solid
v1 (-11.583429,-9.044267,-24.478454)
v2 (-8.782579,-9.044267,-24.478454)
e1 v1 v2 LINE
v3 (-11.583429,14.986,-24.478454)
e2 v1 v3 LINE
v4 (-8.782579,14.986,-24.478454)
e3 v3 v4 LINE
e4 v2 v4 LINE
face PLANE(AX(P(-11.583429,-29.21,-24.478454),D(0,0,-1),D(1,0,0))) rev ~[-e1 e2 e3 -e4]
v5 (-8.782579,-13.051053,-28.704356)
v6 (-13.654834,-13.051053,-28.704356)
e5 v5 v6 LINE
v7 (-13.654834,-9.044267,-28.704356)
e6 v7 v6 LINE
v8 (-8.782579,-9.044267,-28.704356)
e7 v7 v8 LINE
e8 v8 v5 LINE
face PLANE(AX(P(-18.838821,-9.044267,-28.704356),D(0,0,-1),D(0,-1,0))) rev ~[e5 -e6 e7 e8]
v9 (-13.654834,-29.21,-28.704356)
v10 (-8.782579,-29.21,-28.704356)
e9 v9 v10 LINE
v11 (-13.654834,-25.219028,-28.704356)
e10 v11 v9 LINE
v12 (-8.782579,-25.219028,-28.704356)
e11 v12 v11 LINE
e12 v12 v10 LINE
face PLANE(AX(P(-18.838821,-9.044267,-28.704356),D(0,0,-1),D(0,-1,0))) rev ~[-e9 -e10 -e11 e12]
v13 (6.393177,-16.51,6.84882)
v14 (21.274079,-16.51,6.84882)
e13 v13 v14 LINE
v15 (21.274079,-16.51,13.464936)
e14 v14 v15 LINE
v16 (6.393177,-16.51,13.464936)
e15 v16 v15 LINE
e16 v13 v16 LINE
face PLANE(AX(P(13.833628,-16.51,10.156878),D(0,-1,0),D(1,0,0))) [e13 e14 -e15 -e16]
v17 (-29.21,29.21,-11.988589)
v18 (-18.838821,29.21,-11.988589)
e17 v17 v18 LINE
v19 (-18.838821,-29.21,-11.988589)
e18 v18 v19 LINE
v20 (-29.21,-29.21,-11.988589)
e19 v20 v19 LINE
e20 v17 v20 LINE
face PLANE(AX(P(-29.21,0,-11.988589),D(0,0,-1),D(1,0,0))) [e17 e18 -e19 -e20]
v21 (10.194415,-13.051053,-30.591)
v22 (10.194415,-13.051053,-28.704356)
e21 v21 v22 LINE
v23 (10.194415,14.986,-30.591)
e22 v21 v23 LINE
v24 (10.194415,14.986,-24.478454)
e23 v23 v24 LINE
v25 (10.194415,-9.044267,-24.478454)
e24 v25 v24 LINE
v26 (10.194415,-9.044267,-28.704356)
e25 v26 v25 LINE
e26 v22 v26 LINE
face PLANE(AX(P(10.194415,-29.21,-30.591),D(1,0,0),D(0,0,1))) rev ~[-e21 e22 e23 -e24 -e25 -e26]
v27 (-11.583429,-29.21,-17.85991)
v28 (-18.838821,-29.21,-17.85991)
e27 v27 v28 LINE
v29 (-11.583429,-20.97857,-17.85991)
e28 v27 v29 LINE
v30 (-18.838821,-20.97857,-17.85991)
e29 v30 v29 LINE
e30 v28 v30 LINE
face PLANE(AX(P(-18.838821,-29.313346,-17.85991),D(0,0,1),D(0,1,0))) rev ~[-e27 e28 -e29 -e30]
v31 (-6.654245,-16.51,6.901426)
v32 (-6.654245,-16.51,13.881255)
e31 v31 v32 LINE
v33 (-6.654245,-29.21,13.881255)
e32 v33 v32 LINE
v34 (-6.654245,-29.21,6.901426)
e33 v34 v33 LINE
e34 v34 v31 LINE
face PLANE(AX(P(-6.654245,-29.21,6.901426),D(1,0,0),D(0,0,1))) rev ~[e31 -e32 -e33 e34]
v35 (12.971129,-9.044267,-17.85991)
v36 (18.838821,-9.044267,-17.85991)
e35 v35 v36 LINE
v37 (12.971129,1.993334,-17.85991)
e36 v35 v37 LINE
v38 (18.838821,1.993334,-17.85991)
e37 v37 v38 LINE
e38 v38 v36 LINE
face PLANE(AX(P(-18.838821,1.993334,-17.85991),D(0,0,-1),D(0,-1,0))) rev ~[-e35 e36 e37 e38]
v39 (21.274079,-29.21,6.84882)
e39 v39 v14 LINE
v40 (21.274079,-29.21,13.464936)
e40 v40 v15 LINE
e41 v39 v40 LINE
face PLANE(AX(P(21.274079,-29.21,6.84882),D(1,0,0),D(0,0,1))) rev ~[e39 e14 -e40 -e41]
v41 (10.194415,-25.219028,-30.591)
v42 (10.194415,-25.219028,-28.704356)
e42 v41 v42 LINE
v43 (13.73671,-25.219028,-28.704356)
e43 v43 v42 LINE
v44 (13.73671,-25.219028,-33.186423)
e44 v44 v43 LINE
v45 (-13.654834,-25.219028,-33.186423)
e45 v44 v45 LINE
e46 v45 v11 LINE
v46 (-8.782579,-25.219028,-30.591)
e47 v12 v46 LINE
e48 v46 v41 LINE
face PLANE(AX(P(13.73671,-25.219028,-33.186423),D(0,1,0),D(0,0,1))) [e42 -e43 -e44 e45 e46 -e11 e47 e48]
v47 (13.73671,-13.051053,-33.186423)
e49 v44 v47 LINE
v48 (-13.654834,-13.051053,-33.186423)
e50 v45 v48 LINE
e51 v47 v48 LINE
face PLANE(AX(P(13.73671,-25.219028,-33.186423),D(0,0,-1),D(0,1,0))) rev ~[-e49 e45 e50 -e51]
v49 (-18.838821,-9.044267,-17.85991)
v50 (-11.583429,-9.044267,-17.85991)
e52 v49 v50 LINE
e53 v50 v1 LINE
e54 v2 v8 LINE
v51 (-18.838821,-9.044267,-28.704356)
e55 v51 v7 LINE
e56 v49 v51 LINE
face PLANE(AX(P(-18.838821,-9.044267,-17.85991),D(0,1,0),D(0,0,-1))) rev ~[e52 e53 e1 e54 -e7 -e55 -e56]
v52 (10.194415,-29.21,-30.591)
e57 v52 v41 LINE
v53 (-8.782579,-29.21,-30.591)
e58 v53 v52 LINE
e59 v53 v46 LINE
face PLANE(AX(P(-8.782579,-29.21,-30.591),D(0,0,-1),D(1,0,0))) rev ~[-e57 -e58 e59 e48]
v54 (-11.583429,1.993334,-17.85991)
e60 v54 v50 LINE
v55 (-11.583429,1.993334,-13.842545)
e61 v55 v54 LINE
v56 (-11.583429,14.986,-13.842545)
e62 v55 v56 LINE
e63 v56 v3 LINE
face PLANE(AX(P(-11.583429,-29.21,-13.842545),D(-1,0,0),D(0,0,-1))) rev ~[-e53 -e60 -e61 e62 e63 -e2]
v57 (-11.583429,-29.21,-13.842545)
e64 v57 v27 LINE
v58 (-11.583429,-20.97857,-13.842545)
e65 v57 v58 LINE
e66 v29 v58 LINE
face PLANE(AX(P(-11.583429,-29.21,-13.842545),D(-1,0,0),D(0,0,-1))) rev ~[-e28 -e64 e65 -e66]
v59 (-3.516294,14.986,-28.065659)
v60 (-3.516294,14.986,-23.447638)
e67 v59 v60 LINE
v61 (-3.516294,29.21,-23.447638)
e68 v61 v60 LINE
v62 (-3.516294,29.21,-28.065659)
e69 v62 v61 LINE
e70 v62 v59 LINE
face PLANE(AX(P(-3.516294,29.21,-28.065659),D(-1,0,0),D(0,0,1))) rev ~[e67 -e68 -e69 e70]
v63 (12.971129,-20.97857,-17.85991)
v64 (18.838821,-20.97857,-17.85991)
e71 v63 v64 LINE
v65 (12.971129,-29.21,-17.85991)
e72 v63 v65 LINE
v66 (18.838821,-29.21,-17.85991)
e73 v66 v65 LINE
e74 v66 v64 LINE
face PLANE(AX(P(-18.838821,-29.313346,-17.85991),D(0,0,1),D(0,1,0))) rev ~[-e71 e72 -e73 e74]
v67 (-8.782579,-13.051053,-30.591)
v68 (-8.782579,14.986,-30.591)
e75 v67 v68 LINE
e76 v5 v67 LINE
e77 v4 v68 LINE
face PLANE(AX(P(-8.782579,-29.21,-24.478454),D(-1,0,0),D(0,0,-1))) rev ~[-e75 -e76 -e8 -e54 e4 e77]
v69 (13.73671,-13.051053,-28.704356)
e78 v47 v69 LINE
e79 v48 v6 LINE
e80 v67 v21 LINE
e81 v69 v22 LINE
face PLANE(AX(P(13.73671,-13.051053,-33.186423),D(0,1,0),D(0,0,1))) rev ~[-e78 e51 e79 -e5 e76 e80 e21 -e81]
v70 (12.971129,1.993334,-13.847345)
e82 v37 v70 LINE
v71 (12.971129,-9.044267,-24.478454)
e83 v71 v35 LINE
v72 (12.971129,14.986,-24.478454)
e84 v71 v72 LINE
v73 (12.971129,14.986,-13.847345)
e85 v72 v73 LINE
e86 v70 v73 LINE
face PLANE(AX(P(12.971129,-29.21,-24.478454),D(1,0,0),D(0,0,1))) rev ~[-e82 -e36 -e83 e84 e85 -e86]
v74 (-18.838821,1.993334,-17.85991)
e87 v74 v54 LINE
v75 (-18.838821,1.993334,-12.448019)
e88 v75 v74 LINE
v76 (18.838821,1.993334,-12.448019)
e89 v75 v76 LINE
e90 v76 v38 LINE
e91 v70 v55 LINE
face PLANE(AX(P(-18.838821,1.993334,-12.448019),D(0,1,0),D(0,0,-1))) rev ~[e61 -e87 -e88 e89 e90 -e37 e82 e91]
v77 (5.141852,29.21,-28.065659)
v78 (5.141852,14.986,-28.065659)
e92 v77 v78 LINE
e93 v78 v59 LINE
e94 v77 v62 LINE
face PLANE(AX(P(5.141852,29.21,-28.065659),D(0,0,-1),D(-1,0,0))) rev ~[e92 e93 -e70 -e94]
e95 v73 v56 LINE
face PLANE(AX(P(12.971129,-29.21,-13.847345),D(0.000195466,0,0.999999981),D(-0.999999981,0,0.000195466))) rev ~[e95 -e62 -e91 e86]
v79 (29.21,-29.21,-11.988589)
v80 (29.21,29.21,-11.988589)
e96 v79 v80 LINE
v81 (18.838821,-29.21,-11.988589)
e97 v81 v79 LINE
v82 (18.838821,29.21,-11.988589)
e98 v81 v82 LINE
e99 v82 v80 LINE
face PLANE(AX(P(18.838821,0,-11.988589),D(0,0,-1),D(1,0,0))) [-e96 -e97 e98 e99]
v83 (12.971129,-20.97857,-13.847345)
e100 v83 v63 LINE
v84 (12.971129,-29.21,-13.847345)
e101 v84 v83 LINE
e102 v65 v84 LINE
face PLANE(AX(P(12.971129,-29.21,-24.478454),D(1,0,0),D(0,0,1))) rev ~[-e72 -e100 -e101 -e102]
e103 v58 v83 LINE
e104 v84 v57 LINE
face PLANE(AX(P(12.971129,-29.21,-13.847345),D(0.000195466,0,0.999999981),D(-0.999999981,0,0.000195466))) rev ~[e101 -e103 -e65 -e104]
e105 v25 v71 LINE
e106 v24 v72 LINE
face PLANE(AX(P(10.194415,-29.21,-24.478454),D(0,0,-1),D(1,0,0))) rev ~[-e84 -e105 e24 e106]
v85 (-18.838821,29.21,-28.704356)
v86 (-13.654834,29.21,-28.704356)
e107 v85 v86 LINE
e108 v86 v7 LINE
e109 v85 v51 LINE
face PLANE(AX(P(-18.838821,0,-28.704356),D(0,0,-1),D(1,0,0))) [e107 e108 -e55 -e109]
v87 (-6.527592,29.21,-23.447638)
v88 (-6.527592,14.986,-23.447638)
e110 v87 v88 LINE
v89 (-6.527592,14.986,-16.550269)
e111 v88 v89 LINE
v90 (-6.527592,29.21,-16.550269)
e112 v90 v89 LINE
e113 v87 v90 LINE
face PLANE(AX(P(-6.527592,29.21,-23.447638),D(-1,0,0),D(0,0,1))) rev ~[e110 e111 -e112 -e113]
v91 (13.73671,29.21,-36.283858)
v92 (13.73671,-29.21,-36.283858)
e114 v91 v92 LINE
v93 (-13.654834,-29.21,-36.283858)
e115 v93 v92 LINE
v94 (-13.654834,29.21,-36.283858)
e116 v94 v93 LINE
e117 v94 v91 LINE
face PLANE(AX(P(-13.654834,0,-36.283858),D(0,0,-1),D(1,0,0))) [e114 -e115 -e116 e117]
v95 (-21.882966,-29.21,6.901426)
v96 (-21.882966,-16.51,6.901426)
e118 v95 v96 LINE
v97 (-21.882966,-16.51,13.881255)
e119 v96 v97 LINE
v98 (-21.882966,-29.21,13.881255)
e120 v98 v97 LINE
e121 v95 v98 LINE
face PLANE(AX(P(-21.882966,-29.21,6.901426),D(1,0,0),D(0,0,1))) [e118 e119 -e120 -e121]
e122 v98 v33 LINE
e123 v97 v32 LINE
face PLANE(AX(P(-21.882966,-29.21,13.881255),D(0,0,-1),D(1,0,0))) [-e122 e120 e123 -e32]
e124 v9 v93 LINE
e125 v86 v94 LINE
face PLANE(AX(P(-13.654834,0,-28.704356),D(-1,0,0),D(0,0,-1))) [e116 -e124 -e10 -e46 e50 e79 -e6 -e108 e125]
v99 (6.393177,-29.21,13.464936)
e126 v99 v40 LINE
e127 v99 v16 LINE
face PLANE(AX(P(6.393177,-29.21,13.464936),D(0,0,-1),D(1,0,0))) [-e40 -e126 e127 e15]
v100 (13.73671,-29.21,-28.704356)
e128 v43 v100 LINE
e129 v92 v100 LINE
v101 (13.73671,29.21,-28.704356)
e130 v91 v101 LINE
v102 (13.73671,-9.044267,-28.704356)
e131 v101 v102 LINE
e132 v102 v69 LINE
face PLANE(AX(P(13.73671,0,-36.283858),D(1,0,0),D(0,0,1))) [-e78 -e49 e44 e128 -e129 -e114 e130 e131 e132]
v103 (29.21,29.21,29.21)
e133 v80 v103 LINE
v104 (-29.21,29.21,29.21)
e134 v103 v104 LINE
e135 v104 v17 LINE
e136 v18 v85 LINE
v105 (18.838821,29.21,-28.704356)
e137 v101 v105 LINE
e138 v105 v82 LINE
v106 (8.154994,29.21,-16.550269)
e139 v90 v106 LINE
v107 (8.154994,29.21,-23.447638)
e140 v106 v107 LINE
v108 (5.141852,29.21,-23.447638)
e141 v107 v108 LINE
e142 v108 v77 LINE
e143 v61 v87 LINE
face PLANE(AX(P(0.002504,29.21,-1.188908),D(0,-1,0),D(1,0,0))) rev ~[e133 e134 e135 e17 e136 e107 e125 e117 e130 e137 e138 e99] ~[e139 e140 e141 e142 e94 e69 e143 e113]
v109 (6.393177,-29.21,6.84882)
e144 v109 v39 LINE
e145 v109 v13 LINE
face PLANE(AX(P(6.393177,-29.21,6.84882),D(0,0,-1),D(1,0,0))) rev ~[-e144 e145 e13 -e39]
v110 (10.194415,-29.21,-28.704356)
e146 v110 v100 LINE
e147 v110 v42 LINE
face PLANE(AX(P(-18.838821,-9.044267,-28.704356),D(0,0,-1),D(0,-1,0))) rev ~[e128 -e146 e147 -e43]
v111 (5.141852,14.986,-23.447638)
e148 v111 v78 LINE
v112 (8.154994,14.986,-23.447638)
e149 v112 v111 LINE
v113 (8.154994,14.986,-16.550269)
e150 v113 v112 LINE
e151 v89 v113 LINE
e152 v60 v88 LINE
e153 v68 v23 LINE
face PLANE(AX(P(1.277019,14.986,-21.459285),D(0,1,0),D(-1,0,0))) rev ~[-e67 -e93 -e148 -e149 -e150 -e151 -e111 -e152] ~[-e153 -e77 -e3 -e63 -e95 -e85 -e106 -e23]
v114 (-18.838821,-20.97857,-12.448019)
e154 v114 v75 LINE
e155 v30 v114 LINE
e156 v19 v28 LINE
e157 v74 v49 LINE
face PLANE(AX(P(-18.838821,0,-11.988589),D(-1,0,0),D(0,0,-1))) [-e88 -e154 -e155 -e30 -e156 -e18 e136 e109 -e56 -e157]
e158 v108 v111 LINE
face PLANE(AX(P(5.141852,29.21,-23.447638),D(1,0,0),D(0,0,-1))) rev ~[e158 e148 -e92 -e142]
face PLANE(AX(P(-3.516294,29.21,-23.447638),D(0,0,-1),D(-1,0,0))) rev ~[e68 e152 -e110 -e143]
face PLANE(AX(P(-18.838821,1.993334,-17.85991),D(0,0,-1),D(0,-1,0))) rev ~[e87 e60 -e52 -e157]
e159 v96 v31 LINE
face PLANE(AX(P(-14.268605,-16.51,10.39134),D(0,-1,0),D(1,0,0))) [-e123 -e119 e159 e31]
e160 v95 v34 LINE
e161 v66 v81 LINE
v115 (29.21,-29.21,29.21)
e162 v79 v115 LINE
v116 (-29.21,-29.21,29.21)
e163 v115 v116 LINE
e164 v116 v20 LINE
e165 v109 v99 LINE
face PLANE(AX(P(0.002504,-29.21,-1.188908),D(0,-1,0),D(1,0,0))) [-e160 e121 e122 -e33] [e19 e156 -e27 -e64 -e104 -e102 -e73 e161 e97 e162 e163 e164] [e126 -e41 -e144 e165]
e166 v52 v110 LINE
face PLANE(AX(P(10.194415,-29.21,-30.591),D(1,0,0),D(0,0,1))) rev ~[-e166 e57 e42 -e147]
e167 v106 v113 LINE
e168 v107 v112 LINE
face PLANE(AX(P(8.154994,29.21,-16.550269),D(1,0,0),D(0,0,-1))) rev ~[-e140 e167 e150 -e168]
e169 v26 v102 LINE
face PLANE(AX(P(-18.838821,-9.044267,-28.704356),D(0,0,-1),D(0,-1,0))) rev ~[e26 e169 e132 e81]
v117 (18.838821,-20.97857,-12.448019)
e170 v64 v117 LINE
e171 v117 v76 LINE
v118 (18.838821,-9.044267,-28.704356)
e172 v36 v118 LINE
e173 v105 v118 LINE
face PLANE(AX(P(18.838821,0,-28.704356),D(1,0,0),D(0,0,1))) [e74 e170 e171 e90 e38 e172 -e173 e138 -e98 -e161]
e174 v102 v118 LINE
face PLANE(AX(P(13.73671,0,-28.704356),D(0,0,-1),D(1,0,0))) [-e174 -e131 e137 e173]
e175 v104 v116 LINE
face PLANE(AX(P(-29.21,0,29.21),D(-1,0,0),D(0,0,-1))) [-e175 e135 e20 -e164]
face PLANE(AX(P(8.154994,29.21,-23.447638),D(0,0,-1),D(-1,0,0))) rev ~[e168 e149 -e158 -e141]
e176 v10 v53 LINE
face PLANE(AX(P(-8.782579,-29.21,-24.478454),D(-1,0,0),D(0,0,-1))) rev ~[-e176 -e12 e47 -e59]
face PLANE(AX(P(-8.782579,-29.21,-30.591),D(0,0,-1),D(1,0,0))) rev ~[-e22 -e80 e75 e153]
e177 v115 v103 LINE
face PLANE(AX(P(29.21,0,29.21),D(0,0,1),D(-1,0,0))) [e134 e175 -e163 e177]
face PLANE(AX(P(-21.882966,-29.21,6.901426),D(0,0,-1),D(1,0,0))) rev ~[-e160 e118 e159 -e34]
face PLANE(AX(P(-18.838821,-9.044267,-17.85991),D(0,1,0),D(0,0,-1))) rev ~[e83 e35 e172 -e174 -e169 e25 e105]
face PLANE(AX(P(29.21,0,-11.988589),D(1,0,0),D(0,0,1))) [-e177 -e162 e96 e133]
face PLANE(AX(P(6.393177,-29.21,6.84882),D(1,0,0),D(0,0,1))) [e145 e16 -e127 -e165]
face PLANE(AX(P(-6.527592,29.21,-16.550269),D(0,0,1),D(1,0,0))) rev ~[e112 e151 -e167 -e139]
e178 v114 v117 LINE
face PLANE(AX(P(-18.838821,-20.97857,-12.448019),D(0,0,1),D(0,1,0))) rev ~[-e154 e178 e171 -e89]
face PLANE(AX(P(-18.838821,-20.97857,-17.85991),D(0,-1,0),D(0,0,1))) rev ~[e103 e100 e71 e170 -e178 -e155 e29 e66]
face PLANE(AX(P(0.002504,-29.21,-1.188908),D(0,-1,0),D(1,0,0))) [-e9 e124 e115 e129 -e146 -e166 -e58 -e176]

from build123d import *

# Parameters (mm, degrees)
F1_DEPTH  = 29.21
F2_W      = 15.2287210607
F2_H      = 6.9798285036
F2_W_2    = 14.8809022204
F2_H_2    = 6.6161153238
F3_DEPTH  = 12.7
F5_DEPTH  = 58.42
F7_DEPTH  = 37.677641958
F8_W      = 12.1679750076
F8_H      = 4.4820662588
F9_DEPTH  = 27.3915433795
F11_DEPTH = 14.224
F13_DEPTH = 14.224


# Not quite as in the source:
# - a feature names something its author has since deleted; it is built from what else it names


with BuildPart() as f1:
    # F0 (on Front) → F1 (new body, symmetric)
    with BuildSketch(Plane.XZ):
        Polygon((29.21, 29.21), (-29.21, 29.21), (-29.21, -11.9885886088), (-18.838820979, -11.9885886088), (-18.838820979, -28.7043564022), (-13.6548336595, -28.7043564022), (-13.6548336595, -36.2838581204), (13.73670972, -36.2838581204), (13.73670972, -28.7043564022), (18.838820979, -28.7043564022), (18.838820979, -11.9885886088), (29.21, -11.9885886088), align=None)
    extrude(amount=F1_DEPTH, both=True)

    # F2 (on face) → F3 (cut)
    with BuildSketch(Plane.XZ.offset(29.21)):
        with Locations((-14.2686051116, 10.3913402672)):
            Rectangle(F2_W, F2_H)
        with Locations((13.8336278745, 10.1568780676)):
            Rectangle(F2_W_2, F2_H_2)
    extrude(amount=-F3_DEPTH, mode=Mode.SUBTRACT)

    # F4 (on face) → F5 (cut, through all)
    with BuildSketch(Plane.XZ.offset(29.21)):
        Polygon((-11.5834288299, -13.842545168), (-11.5834288299, -24.4784541428), (-8.7825786322, -24.4784541428), (-8.7825786322, -30.5909998715), (10.1944149937, -30.5909998715), (10.1944149937, -24.4784541428), (12.9711292684, -24.4784541428), (12.9711292684, -13.8473447557), align=None)
    extrude(amount=-F5_DEPTH, mode=Mode.SUBTRACT)

    # F6 (on face) → F7 (cut, through all)
    with BuildSketch(Plane(origin=(-18.838820979, 0, 0), x_dir=(0, -1, 0), z_dir=(-1, 0, 0))):
        Polygon((20.9785699844, -12.4480193481), (-1.9933339208, -12.4480193481), (-1.9933339208, -17.8599096835), (9.0442672372, -17.8599096835), (9.0442672372, -28.7043564022), (29.3133463711, -28.7043564022), (29.3133463711, -17.8599096835), (20.9785699844, -17.8599096835), align=None)
    extrude(amount=-F7_DEPTH, mode=Mode.SUBTRACT)

    # F8 (on face) → F9 (cut, through all)
    with BuildSketch(Plane.YZ.offset(13.73670972)):
        with Locations((-19.1350400816, -30.9453895316)):
            Rectangle(F8_W, F8_H)
    extrude(amount=-F9_DEPTH, mode=Mode.SUBTRACT)

    # F10 (on face) → F11 (join)
    with BuildSketch(Plane(origin=(0, 29.21, 0), x_dir=(-1, 0, 0), z_dir=(0, 1, 0))):
        Polygon((12.8193823621, -11.6105714807), (-15.3379710391, -11.6105714807), (-15.3379710391, -26.3032335788), (-12.9711292684, -26.3032335788), (-12.9795083776, -31.884662807), (10.1667114277, -31.884662807), (10.1667114277, -26.3032335788), (12.8193823621, -26.3032335788), align=None)
    extrude(amount=-F11_DEPTH)

    # F12 (on face) → F13 (cut, through all)
    with BuildSketch(Plane(origin=(0, 29.21, 0), x_dir=(-1, 0, 0), z_dir=(0, 1, 0))):
        Polygon((6.527592428, -23.4476383775), (6.527592428, -16.5502689779), (-8.1549943425, -16.5502689779), (-8.1549943425, -23.4476383775), (-5.1418524235, -23.4476383775), (-5.1418524235, -28.0656591058), (3.516294295, -28.0656591058), (3.516294295, -23.4476383775), align=None)
    extrude(amount=-F13_DEPTH, mode=Mode.SUBTRACT)


solid = f1.part
